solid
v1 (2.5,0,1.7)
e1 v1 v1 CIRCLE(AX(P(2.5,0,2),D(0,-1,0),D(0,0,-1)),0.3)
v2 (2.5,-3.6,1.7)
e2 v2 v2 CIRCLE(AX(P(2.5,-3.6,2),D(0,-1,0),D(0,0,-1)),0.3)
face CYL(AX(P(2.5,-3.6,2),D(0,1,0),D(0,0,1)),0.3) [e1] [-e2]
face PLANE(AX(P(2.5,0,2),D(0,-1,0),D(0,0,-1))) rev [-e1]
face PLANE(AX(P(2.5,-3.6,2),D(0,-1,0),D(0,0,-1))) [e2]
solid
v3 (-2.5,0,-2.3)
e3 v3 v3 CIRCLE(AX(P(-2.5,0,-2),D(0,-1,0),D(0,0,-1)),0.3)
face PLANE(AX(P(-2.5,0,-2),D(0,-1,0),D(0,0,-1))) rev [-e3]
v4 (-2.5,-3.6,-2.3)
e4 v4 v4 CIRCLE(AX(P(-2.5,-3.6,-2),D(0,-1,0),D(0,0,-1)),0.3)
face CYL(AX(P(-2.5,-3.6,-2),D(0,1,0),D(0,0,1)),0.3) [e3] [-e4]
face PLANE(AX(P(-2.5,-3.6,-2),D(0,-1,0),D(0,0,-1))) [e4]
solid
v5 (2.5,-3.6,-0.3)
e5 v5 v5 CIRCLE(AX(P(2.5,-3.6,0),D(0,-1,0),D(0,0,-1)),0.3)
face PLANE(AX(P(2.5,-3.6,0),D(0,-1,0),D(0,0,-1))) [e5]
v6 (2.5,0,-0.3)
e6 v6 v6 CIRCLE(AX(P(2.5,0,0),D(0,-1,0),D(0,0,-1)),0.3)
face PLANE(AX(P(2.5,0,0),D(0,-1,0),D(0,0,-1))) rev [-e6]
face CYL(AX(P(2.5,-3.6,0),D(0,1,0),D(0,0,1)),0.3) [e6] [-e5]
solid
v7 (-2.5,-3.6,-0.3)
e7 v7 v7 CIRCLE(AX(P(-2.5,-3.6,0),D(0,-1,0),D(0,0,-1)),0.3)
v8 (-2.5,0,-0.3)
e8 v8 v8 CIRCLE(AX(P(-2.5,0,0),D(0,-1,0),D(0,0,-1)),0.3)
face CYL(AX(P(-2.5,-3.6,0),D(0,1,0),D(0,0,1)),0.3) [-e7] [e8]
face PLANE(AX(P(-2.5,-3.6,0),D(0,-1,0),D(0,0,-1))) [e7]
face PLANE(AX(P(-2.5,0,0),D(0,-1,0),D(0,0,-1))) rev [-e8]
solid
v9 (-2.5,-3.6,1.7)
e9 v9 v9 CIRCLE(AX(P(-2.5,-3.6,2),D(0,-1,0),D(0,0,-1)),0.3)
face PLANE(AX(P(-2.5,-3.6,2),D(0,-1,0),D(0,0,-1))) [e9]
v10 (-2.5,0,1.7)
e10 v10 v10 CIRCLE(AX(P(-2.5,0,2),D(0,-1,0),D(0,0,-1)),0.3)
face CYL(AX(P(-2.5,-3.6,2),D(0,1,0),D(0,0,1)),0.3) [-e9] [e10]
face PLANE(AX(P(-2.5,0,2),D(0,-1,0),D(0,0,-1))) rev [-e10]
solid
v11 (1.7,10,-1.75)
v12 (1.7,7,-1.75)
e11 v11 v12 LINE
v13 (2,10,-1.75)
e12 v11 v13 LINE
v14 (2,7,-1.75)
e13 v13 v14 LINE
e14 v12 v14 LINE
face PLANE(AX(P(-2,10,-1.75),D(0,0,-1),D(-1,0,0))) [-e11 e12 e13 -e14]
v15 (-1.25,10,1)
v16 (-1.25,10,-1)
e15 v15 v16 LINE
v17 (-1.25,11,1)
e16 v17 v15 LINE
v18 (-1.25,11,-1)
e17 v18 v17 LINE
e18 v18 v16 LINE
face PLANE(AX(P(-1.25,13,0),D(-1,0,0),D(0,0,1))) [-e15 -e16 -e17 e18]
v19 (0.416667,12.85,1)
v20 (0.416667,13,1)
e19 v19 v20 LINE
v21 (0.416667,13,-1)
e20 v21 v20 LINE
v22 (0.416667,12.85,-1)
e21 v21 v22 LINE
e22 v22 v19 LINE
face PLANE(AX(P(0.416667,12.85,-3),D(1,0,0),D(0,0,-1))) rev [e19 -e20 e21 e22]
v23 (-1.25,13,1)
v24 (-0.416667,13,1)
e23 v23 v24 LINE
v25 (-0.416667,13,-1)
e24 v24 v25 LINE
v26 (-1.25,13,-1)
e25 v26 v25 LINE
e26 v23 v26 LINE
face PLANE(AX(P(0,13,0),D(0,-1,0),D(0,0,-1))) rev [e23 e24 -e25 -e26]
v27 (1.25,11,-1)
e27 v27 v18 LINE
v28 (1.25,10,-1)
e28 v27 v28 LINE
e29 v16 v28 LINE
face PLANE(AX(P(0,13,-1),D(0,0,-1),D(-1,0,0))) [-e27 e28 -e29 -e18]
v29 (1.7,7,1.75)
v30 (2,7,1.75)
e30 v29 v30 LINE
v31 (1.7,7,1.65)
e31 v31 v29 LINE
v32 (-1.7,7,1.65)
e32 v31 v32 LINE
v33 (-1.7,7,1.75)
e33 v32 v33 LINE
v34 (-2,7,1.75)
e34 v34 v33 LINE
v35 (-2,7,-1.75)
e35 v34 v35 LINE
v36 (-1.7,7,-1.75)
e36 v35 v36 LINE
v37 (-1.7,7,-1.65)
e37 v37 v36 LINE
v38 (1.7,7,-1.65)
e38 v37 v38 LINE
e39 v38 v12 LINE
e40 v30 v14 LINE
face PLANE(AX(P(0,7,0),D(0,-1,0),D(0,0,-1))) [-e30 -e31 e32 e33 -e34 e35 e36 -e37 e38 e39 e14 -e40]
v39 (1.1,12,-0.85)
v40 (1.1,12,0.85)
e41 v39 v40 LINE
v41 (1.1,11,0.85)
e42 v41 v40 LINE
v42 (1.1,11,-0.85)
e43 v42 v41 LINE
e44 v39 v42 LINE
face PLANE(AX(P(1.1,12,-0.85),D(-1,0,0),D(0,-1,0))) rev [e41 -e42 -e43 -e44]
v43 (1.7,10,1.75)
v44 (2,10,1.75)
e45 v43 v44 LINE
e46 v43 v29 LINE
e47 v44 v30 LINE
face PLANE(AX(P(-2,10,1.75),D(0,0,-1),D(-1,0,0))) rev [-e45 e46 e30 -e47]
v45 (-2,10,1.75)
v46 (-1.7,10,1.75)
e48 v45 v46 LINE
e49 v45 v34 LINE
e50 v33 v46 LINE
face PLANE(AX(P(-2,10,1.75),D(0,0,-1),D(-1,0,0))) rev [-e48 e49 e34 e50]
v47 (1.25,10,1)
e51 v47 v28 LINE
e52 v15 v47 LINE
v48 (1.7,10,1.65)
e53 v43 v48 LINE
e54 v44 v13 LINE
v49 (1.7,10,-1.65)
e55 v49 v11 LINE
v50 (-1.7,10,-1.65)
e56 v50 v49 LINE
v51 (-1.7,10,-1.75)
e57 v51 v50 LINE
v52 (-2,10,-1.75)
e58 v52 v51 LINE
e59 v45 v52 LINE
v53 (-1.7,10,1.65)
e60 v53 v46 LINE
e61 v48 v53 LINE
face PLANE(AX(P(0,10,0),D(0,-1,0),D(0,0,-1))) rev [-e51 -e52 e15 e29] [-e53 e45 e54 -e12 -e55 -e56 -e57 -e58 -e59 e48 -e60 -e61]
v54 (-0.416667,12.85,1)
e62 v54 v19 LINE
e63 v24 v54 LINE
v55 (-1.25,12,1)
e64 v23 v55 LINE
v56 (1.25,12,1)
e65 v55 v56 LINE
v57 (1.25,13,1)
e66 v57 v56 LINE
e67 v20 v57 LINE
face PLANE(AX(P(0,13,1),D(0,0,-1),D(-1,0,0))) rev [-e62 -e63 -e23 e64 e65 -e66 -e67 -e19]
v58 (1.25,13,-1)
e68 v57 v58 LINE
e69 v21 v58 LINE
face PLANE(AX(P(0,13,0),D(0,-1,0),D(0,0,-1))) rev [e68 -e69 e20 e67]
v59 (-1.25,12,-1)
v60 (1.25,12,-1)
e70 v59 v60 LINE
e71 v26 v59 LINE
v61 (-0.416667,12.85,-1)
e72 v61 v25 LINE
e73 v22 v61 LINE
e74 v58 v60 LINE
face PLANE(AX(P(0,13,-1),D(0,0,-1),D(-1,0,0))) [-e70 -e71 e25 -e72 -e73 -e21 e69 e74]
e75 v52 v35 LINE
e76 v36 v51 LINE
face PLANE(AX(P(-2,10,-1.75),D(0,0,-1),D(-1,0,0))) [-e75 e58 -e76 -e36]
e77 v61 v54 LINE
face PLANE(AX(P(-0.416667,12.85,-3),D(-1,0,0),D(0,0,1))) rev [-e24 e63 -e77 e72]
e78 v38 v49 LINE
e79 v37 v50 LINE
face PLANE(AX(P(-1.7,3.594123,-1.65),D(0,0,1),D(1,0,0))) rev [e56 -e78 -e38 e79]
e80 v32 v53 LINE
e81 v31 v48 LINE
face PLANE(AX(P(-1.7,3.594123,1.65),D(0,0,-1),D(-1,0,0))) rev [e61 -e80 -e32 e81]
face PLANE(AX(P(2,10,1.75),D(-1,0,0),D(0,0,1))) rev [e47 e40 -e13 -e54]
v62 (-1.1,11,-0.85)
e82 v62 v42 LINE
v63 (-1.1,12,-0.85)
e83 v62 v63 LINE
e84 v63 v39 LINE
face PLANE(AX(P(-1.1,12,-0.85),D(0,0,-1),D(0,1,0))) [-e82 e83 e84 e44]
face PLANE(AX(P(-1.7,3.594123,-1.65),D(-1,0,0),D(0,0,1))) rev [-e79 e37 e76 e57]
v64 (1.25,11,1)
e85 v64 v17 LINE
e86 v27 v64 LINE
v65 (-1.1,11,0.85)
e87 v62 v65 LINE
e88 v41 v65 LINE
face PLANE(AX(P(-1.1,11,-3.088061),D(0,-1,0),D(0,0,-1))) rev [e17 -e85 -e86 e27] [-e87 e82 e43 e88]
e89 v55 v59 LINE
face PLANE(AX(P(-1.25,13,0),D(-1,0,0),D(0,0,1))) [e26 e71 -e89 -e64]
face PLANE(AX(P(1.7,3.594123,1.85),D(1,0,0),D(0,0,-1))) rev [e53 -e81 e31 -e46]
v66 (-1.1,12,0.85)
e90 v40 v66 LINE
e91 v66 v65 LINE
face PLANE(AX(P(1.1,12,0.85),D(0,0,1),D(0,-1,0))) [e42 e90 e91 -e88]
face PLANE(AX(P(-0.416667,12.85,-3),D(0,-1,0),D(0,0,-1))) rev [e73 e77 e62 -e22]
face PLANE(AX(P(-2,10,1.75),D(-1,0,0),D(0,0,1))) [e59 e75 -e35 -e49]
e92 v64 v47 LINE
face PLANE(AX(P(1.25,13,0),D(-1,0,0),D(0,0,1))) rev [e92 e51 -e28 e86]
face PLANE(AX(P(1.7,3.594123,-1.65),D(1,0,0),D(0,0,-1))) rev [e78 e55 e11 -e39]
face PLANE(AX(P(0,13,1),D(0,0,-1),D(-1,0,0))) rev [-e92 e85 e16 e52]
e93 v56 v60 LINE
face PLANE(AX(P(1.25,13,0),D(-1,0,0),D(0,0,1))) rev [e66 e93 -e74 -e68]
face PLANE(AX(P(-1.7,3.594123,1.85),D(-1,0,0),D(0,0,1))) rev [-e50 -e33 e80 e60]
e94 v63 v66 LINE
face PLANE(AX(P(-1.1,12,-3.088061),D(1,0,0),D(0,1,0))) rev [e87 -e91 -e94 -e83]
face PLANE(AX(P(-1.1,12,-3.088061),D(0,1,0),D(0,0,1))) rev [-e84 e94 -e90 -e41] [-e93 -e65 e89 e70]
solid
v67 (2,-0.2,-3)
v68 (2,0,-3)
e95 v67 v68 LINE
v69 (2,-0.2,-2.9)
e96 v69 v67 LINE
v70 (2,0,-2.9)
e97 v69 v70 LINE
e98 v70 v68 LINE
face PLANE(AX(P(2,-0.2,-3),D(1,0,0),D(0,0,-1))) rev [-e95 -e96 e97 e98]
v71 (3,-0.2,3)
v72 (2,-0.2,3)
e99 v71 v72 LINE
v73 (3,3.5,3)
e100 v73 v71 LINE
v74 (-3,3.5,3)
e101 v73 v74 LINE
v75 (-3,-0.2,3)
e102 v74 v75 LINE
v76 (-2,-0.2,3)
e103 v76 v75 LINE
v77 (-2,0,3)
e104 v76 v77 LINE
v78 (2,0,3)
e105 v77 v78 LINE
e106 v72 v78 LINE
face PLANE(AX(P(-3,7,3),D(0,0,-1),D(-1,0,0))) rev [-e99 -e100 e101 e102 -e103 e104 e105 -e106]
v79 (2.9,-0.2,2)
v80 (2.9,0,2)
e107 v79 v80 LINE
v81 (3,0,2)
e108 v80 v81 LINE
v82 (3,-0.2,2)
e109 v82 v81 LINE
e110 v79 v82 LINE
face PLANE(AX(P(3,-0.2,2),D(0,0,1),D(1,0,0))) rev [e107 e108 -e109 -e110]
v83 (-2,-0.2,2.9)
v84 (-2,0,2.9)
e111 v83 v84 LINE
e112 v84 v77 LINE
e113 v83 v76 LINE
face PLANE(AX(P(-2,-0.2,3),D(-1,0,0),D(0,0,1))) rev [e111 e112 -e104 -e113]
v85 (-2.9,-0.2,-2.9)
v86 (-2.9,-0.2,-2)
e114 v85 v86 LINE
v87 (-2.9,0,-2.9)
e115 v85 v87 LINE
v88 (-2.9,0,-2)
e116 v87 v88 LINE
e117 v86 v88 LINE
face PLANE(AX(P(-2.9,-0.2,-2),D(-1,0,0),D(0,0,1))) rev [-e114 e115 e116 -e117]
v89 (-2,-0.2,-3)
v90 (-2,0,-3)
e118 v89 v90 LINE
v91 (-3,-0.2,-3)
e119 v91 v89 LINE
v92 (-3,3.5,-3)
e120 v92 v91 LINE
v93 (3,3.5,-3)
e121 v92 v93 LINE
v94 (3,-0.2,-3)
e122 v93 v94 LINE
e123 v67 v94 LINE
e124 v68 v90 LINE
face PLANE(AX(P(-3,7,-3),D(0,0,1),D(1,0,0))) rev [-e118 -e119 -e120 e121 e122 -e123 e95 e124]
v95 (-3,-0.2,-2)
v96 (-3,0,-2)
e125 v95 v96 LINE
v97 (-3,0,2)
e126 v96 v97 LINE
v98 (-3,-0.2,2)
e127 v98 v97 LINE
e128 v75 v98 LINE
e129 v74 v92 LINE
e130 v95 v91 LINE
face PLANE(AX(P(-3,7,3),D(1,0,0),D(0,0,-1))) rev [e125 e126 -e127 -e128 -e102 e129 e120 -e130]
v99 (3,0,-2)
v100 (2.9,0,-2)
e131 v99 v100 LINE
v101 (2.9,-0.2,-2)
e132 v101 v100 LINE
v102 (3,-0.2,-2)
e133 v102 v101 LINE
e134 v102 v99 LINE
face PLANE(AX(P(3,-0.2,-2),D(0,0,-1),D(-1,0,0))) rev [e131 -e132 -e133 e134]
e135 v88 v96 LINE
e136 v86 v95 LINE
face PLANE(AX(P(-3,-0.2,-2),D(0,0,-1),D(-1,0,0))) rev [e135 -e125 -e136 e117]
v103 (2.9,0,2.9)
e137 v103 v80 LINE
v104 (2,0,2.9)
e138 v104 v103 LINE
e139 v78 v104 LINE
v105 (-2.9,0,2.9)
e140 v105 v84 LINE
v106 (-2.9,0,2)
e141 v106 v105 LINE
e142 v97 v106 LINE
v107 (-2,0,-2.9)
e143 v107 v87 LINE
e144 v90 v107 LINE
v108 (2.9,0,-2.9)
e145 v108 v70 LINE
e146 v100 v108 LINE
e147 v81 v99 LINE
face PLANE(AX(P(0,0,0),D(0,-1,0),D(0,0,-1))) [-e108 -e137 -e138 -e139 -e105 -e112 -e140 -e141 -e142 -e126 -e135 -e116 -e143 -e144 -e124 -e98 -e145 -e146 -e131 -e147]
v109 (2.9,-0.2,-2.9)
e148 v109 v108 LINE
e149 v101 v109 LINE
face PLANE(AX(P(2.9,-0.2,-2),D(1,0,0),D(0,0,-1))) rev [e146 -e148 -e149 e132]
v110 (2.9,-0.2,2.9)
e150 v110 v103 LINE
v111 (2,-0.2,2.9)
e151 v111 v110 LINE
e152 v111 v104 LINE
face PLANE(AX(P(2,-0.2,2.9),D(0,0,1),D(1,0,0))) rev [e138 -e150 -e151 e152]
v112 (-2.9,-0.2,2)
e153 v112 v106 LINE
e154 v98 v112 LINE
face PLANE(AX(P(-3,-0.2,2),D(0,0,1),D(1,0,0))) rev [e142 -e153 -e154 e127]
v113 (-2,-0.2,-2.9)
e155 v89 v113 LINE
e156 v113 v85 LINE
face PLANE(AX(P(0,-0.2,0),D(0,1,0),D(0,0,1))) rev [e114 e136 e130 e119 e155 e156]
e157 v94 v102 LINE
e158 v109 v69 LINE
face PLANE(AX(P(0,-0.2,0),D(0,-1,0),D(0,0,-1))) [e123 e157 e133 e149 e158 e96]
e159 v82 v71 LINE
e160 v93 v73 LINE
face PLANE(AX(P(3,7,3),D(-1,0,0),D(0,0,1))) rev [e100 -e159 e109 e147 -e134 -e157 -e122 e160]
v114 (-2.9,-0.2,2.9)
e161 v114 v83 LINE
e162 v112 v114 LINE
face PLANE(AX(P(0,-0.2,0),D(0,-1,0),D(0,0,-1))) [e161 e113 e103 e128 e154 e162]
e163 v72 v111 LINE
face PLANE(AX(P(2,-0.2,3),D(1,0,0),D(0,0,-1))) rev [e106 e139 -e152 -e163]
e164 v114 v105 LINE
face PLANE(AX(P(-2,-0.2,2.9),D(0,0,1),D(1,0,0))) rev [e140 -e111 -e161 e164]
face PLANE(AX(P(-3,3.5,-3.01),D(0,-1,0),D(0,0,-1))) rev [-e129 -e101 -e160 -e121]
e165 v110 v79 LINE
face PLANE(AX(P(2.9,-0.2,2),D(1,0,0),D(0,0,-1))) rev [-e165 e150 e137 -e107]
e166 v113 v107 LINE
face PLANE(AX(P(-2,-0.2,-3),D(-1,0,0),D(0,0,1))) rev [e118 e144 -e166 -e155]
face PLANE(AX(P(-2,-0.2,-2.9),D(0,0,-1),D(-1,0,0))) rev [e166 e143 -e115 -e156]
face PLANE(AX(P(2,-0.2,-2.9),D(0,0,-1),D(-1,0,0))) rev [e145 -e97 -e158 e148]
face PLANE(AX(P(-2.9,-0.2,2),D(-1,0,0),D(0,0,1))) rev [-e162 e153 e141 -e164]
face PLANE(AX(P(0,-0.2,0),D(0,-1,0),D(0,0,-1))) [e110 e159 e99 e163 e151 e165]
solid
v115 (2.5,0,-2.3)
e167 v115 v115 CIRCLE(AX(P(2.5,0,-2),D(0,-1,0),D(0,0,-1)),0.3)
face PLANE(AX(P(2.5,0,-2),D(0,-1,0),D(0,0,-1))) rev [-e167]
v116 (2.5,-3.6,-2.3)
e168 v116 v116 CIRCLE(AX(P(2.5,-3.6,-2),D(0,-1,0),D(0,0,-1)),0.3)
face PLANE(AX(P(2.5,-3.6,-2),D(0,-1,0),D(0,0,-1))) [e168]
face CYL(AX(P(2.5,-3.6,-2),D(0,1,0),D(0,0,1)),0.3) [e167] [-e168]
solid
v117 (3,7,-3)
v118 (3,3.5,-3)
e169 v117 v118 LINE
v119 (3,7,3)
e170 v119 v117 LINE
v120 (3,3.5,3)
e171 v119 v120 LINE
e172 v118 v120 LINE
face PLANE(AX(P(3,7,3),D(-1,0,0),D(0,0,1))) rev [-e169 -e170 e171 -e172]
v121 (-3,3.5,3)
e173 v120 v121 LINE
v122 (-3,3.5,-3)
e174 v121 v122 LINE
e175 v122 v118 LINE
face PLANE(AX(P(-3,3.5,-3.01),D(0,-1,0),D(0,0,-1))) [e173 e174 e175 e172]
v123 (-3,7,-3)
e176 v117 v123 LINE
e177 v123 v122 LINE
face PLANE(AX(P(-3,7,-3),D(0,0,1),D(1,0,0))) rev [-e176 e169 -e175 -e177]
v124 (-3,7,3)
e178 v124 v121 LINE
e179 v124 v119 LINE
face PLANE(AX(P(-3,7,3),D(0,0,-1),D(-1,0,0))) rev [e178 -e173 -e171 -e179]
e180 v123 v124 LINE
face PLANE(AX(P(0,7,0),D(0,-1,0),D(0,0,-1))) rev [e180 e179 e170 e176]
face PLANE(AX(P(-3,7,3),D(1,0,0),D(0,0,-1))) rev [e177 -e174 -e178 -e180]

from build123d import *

# Parameters (mm, degrees)
SKETCH_1_W                     = 6
SKETCH_1_H                     = 6
EXTRUDE_1_DEPTH                = 7
SPLIT_BODIES_1_SURFACE_1_BACK  = 12
SPLIT_BODIES_1_SURFACE_1_DEPTH = 24
SPLIT_BODIES_1_SURFACE_2_BACK  = 12
SPLIT_BODIES_1_SURFACE_2_DEPTH = 24
SKETCH_3_W                     = 4
SKETCH_3_H                     = 3.5
EXTRUDE_2_DEPTH                = 3
EXTRUDE_START                  = 3
SKETCH_3_3_W                   = 2.5
SKETCH_3_3_H                   = 2
EXTRUDE_3_DEPTH                = 3
SKETCH_4_W                     = 0.833333334
SKETCH_4_H                     = 0.3
CUT_EXTRUDE_1_DEPTH            = 14.928388277
SWEEP_START                    = 11
SWEEP_1_OUTLINE_W              = 2.5
SWEEP_1_OUTLINE_H              = 2
SWEEP_1_OUTLINE_W_2            = 2.2
SWEEP_1_OUTLINE_H_2            = 1.7
SWEEP_1_DEPTH                  = 1
SKETCH_10_W                    = 3.4
SKETCH_10_H                    = 0.2
CUT_EXTRUDE_2_DEPTH            = 3
EXTRUDE_4_DEPTH                = 0.2
SKETCH_12_R                    = 0.3
EXTRUDE_5_DEPTH                = 3.6
EXTRUDE_5_2_DEPTH              = 3.6
EXTRUDE_5_3_DEPTH              = 3.6
EXTRUDE_5_4_DEPTH              = 3.6
EXTRUDE_5_5_DEPTH              = 3.6
EXTRUDE_5_6_DEPTH              = 3.6


# Read off the part's stored shape, not the designer's step: Вырез-По траектории1
with BuildPart() as part:
    # Эскиз1 → Бобышка-Вытянуть1 (new body)
    with BuildSketch(Plane(origin=(0, 0, 0), x_dir=(1, 0, 0), z_dir=(0, 1, 0))):
        Rectangle(SKETCH_1_W, SKETCH_1_H)
    extrude(amount=EXTRUDE_1_DEPTH)


with BuildPart() as body_2:
    # Split Bodies 1: the piece behind the surface
    add(part.part)
    # Split Bodies 1 surface: a surface, the sketch's curves swept straight by 24 mm
    with BuildLine(Plane.XY.offset(3).offset(-SPLIT_BODIES_1_SURFACE_1_BACK), mode=Mode.PRIVATE) as split_bodies_1_surface_1_path:
        Line((-3, 3.5), (3, 3.5))
    split_bodies_1_surface_1 = Shell.extrude(split_bodies_1_surface_1_path.wire(), (0 * SPLIT_BODIES_1_SURFACE_1_DEPTH, 0 * SPLIT_BODIES_1_SURFACE_1_DEPTH, 1 * SPLIT_BODIES_1_SURFACE_1_DEPTH))
    split(bisect_by=split_bodies_1_surface_1, keep=Keep.BOTTOM)

    # Эскиз11 → Бобышка-Вытянуть4 (add)
    with BuildSketch(Plane.XZ):
        Polygon((-3, 3), (-2, 3), (-2, 2.9), (-2.9, 2.9), (-2.9, 2), (-3, 2), align=None)
        Polygon((2, 3), (2, 2.9), (2.9, 2.9), (2.9, 2), (3, 2), (3, 3), align=None)
        Polygon((3, -2), (2.9, -2), (2.9, -2.9), (2, -2.9), (2, -3), (3, -3), align=None)
        Polygon((-3, -2), (-2.9, -2), (-2.9, -2.9), (-2, -2.9), (-2, -3), (-3, -3), align=None)
    extrude(amount=EXTRUDE_4_DEPTH)


with BuildPart() as part_1:
    add(part.part)

    # Split Bodies 1: split by a surface, the side it looks to stays
    # Split Bodies 1 surface: a surface, the sketch's curves swept straight by 24 mm
    with BuildLine(Plane.XY.offset(3).offset(-SPLIT_BODIES_1_SURFACE_2_BACK), mode=Mode.PRIVATE) as split_bodies_1_surface_2_path:
        Line((-3, 3.5), (3, 3.5))
    split_bodies_1_surface_2 = Shell.extrude(split_bodies_1_surface_2_path.wire(), (0 * SPLIT_BODIES_1_SURFACE_2_DEPTH, 0 * SPLIT_BODIES_1_SURFACE_2_DEPTH, 1 * SPLIT_BODIES_1_SURFACE_2_DEPTH))
    split(bisect_by=split_bodies_1_surface_2, keep=Keep.TOP)


with BuildPart() as body_3:
    # Эскиз3 → Бобышка-Вытянуть2 (new body)
    with BuildSketch(Plane(origin=(0, 7, 0), x_dir=(1, 0, 0), z_dir=(0, 1, 0))):
        Rectangle(SKETCH_3_W, SKETCH_3_H)
    extrude(amount=EXTRUDE_2_DEPTH)

    # Эскиз3<3> → Бобышка-Вытянуть3 (add)
    with BuildSketch(Plane(origin=(0, 7, 0), x_dir=(1, 0, 0), z_dir=(0, 1, 0)).offset(EXTRUDE_START)):
        Rectangle(SKETCH_3_3_W, SKETCH_3_3_H)
    extrude(amount=EXTRUDE_3_DEPTH)

    # Эскиз4 → Вырез-Вытянуть1 (cut, through all)
    with BuildSketch(Plane.XY.offset(1)):
        with Locations((0, 13)):
            Rectangle(SKETCH_4_W, SKETCH_4_H)
    extrude(amount=-CUT_EXTRUDE_1_DEPTH, mode=Mode.SUBTRACT)

    # Вырез-По траектории1 outline → Вырез-По траектории1 (cut)
    with BuildSketch(Plane(origin=(0, 0, 0), x_dir=(1, 0, 0), z_dir=(0, 1, 0)).offset(SWEEP_START)):
        Rectangle(SWEEP_1_OUTLINE_W, SWEEP_1_OUTLINE_H)
        Rectangle(SWEEP_1_OUTLINE_W_2, SWEEP_1_OUTLINE_H_2, mode=Mode.SUBTRACT)
    extrude(amount=SWEEP_1_DEPTH, mode=Mode.SUBTRACT)

    # Эскиз10 → Вырез-Вытянуть2 (cut)
    with BuildSketch(Plane(origin=(0, 10, 0), x_dir=(1, 0, 0), z_dir=(0, 1, 0))):
        with Locations((0, -1.75)):
            Rectangle(SKETCH_10_W, SKETCH_10_H)
        with Locations((0, 1.75)):
            Rectangle(SKETCH_10_W, SKETCH_10_H)
    extrude(amount=-CUT_EXTRUDE_2_DEPTH, mode=Mode.SUBTRACT)


with BuildPart() as body_4:
    # Эскиз12 → Бобышка-Вытянуть5 (new body)
    with BuildSketch(Plane.XZ):
        with Locations(Location((-2.5, 2, 0), (0, 0, 270))):
            Circle(SKETCH_12_R)
    extrude(amount=EXTRUDE_5_DEPTH)


with BuildPart() as body_5:
    # Эскиз12 → Extrude 5 2 (new body)
    with BuildSketch(Plane.XZ):
        with Locations(Location((2.5, 2, 0), (0, 0, 270))):
            Circle(SKETCH_12_R)
    extrude(amount=EXTRUDE_5_2_DEPTH)


with BuildPart() as body_6:
    # Эскиз12 → Extrude 5 3 (new body)
    with BuildSketch(Plane.XZ):
        with Locations(Location((2.5, 0, 0), (0, 0, 270))):
            Circle(SKETCH_12_R)
    extrude(amount=EXTRUDE_5_3_DEPTH)


with BuildPart() as body_7:
    # Эскиз12 → Extrude 5 4 (new body)
    with BuildSketch(Plane.XZ):
        with Locations(Location((2.5, -2, 0), (0, 0, 270))):
            Circle(SKETCH_12_R)
    extrude(amount=EXTRUDE_5_4_DEPTH)


with BuildPart() as body_8:
    # Эскиз12 → Extrude 5 5 (new body)
    with BuildSketch(Plane.XZ):
        with Locations(Location((-2.5, 0, 0), (0, 0, 270))):
            Circle(SKETCH_12_R)
    extrude(amount=EXTRUDE_5_5_DEPTH)


with BuildPart() as body_9:
    # Эскиз12 → Extrude 5 6 (new body)
    with BuildSketch(Plane.XZ):
        with Locations(Location((-2.5, -2, 0), (0, 0, 270))):
            Circle(SKETCH_12_R)
    extrude(amount=EXTRUDE_5_6_DEPTH)


solid = Compound([body_2.part, part_1.part, body_3.part, body_4.part, body_5.part, body_6.part, body_7.part, body_8.part, body_9.part])
